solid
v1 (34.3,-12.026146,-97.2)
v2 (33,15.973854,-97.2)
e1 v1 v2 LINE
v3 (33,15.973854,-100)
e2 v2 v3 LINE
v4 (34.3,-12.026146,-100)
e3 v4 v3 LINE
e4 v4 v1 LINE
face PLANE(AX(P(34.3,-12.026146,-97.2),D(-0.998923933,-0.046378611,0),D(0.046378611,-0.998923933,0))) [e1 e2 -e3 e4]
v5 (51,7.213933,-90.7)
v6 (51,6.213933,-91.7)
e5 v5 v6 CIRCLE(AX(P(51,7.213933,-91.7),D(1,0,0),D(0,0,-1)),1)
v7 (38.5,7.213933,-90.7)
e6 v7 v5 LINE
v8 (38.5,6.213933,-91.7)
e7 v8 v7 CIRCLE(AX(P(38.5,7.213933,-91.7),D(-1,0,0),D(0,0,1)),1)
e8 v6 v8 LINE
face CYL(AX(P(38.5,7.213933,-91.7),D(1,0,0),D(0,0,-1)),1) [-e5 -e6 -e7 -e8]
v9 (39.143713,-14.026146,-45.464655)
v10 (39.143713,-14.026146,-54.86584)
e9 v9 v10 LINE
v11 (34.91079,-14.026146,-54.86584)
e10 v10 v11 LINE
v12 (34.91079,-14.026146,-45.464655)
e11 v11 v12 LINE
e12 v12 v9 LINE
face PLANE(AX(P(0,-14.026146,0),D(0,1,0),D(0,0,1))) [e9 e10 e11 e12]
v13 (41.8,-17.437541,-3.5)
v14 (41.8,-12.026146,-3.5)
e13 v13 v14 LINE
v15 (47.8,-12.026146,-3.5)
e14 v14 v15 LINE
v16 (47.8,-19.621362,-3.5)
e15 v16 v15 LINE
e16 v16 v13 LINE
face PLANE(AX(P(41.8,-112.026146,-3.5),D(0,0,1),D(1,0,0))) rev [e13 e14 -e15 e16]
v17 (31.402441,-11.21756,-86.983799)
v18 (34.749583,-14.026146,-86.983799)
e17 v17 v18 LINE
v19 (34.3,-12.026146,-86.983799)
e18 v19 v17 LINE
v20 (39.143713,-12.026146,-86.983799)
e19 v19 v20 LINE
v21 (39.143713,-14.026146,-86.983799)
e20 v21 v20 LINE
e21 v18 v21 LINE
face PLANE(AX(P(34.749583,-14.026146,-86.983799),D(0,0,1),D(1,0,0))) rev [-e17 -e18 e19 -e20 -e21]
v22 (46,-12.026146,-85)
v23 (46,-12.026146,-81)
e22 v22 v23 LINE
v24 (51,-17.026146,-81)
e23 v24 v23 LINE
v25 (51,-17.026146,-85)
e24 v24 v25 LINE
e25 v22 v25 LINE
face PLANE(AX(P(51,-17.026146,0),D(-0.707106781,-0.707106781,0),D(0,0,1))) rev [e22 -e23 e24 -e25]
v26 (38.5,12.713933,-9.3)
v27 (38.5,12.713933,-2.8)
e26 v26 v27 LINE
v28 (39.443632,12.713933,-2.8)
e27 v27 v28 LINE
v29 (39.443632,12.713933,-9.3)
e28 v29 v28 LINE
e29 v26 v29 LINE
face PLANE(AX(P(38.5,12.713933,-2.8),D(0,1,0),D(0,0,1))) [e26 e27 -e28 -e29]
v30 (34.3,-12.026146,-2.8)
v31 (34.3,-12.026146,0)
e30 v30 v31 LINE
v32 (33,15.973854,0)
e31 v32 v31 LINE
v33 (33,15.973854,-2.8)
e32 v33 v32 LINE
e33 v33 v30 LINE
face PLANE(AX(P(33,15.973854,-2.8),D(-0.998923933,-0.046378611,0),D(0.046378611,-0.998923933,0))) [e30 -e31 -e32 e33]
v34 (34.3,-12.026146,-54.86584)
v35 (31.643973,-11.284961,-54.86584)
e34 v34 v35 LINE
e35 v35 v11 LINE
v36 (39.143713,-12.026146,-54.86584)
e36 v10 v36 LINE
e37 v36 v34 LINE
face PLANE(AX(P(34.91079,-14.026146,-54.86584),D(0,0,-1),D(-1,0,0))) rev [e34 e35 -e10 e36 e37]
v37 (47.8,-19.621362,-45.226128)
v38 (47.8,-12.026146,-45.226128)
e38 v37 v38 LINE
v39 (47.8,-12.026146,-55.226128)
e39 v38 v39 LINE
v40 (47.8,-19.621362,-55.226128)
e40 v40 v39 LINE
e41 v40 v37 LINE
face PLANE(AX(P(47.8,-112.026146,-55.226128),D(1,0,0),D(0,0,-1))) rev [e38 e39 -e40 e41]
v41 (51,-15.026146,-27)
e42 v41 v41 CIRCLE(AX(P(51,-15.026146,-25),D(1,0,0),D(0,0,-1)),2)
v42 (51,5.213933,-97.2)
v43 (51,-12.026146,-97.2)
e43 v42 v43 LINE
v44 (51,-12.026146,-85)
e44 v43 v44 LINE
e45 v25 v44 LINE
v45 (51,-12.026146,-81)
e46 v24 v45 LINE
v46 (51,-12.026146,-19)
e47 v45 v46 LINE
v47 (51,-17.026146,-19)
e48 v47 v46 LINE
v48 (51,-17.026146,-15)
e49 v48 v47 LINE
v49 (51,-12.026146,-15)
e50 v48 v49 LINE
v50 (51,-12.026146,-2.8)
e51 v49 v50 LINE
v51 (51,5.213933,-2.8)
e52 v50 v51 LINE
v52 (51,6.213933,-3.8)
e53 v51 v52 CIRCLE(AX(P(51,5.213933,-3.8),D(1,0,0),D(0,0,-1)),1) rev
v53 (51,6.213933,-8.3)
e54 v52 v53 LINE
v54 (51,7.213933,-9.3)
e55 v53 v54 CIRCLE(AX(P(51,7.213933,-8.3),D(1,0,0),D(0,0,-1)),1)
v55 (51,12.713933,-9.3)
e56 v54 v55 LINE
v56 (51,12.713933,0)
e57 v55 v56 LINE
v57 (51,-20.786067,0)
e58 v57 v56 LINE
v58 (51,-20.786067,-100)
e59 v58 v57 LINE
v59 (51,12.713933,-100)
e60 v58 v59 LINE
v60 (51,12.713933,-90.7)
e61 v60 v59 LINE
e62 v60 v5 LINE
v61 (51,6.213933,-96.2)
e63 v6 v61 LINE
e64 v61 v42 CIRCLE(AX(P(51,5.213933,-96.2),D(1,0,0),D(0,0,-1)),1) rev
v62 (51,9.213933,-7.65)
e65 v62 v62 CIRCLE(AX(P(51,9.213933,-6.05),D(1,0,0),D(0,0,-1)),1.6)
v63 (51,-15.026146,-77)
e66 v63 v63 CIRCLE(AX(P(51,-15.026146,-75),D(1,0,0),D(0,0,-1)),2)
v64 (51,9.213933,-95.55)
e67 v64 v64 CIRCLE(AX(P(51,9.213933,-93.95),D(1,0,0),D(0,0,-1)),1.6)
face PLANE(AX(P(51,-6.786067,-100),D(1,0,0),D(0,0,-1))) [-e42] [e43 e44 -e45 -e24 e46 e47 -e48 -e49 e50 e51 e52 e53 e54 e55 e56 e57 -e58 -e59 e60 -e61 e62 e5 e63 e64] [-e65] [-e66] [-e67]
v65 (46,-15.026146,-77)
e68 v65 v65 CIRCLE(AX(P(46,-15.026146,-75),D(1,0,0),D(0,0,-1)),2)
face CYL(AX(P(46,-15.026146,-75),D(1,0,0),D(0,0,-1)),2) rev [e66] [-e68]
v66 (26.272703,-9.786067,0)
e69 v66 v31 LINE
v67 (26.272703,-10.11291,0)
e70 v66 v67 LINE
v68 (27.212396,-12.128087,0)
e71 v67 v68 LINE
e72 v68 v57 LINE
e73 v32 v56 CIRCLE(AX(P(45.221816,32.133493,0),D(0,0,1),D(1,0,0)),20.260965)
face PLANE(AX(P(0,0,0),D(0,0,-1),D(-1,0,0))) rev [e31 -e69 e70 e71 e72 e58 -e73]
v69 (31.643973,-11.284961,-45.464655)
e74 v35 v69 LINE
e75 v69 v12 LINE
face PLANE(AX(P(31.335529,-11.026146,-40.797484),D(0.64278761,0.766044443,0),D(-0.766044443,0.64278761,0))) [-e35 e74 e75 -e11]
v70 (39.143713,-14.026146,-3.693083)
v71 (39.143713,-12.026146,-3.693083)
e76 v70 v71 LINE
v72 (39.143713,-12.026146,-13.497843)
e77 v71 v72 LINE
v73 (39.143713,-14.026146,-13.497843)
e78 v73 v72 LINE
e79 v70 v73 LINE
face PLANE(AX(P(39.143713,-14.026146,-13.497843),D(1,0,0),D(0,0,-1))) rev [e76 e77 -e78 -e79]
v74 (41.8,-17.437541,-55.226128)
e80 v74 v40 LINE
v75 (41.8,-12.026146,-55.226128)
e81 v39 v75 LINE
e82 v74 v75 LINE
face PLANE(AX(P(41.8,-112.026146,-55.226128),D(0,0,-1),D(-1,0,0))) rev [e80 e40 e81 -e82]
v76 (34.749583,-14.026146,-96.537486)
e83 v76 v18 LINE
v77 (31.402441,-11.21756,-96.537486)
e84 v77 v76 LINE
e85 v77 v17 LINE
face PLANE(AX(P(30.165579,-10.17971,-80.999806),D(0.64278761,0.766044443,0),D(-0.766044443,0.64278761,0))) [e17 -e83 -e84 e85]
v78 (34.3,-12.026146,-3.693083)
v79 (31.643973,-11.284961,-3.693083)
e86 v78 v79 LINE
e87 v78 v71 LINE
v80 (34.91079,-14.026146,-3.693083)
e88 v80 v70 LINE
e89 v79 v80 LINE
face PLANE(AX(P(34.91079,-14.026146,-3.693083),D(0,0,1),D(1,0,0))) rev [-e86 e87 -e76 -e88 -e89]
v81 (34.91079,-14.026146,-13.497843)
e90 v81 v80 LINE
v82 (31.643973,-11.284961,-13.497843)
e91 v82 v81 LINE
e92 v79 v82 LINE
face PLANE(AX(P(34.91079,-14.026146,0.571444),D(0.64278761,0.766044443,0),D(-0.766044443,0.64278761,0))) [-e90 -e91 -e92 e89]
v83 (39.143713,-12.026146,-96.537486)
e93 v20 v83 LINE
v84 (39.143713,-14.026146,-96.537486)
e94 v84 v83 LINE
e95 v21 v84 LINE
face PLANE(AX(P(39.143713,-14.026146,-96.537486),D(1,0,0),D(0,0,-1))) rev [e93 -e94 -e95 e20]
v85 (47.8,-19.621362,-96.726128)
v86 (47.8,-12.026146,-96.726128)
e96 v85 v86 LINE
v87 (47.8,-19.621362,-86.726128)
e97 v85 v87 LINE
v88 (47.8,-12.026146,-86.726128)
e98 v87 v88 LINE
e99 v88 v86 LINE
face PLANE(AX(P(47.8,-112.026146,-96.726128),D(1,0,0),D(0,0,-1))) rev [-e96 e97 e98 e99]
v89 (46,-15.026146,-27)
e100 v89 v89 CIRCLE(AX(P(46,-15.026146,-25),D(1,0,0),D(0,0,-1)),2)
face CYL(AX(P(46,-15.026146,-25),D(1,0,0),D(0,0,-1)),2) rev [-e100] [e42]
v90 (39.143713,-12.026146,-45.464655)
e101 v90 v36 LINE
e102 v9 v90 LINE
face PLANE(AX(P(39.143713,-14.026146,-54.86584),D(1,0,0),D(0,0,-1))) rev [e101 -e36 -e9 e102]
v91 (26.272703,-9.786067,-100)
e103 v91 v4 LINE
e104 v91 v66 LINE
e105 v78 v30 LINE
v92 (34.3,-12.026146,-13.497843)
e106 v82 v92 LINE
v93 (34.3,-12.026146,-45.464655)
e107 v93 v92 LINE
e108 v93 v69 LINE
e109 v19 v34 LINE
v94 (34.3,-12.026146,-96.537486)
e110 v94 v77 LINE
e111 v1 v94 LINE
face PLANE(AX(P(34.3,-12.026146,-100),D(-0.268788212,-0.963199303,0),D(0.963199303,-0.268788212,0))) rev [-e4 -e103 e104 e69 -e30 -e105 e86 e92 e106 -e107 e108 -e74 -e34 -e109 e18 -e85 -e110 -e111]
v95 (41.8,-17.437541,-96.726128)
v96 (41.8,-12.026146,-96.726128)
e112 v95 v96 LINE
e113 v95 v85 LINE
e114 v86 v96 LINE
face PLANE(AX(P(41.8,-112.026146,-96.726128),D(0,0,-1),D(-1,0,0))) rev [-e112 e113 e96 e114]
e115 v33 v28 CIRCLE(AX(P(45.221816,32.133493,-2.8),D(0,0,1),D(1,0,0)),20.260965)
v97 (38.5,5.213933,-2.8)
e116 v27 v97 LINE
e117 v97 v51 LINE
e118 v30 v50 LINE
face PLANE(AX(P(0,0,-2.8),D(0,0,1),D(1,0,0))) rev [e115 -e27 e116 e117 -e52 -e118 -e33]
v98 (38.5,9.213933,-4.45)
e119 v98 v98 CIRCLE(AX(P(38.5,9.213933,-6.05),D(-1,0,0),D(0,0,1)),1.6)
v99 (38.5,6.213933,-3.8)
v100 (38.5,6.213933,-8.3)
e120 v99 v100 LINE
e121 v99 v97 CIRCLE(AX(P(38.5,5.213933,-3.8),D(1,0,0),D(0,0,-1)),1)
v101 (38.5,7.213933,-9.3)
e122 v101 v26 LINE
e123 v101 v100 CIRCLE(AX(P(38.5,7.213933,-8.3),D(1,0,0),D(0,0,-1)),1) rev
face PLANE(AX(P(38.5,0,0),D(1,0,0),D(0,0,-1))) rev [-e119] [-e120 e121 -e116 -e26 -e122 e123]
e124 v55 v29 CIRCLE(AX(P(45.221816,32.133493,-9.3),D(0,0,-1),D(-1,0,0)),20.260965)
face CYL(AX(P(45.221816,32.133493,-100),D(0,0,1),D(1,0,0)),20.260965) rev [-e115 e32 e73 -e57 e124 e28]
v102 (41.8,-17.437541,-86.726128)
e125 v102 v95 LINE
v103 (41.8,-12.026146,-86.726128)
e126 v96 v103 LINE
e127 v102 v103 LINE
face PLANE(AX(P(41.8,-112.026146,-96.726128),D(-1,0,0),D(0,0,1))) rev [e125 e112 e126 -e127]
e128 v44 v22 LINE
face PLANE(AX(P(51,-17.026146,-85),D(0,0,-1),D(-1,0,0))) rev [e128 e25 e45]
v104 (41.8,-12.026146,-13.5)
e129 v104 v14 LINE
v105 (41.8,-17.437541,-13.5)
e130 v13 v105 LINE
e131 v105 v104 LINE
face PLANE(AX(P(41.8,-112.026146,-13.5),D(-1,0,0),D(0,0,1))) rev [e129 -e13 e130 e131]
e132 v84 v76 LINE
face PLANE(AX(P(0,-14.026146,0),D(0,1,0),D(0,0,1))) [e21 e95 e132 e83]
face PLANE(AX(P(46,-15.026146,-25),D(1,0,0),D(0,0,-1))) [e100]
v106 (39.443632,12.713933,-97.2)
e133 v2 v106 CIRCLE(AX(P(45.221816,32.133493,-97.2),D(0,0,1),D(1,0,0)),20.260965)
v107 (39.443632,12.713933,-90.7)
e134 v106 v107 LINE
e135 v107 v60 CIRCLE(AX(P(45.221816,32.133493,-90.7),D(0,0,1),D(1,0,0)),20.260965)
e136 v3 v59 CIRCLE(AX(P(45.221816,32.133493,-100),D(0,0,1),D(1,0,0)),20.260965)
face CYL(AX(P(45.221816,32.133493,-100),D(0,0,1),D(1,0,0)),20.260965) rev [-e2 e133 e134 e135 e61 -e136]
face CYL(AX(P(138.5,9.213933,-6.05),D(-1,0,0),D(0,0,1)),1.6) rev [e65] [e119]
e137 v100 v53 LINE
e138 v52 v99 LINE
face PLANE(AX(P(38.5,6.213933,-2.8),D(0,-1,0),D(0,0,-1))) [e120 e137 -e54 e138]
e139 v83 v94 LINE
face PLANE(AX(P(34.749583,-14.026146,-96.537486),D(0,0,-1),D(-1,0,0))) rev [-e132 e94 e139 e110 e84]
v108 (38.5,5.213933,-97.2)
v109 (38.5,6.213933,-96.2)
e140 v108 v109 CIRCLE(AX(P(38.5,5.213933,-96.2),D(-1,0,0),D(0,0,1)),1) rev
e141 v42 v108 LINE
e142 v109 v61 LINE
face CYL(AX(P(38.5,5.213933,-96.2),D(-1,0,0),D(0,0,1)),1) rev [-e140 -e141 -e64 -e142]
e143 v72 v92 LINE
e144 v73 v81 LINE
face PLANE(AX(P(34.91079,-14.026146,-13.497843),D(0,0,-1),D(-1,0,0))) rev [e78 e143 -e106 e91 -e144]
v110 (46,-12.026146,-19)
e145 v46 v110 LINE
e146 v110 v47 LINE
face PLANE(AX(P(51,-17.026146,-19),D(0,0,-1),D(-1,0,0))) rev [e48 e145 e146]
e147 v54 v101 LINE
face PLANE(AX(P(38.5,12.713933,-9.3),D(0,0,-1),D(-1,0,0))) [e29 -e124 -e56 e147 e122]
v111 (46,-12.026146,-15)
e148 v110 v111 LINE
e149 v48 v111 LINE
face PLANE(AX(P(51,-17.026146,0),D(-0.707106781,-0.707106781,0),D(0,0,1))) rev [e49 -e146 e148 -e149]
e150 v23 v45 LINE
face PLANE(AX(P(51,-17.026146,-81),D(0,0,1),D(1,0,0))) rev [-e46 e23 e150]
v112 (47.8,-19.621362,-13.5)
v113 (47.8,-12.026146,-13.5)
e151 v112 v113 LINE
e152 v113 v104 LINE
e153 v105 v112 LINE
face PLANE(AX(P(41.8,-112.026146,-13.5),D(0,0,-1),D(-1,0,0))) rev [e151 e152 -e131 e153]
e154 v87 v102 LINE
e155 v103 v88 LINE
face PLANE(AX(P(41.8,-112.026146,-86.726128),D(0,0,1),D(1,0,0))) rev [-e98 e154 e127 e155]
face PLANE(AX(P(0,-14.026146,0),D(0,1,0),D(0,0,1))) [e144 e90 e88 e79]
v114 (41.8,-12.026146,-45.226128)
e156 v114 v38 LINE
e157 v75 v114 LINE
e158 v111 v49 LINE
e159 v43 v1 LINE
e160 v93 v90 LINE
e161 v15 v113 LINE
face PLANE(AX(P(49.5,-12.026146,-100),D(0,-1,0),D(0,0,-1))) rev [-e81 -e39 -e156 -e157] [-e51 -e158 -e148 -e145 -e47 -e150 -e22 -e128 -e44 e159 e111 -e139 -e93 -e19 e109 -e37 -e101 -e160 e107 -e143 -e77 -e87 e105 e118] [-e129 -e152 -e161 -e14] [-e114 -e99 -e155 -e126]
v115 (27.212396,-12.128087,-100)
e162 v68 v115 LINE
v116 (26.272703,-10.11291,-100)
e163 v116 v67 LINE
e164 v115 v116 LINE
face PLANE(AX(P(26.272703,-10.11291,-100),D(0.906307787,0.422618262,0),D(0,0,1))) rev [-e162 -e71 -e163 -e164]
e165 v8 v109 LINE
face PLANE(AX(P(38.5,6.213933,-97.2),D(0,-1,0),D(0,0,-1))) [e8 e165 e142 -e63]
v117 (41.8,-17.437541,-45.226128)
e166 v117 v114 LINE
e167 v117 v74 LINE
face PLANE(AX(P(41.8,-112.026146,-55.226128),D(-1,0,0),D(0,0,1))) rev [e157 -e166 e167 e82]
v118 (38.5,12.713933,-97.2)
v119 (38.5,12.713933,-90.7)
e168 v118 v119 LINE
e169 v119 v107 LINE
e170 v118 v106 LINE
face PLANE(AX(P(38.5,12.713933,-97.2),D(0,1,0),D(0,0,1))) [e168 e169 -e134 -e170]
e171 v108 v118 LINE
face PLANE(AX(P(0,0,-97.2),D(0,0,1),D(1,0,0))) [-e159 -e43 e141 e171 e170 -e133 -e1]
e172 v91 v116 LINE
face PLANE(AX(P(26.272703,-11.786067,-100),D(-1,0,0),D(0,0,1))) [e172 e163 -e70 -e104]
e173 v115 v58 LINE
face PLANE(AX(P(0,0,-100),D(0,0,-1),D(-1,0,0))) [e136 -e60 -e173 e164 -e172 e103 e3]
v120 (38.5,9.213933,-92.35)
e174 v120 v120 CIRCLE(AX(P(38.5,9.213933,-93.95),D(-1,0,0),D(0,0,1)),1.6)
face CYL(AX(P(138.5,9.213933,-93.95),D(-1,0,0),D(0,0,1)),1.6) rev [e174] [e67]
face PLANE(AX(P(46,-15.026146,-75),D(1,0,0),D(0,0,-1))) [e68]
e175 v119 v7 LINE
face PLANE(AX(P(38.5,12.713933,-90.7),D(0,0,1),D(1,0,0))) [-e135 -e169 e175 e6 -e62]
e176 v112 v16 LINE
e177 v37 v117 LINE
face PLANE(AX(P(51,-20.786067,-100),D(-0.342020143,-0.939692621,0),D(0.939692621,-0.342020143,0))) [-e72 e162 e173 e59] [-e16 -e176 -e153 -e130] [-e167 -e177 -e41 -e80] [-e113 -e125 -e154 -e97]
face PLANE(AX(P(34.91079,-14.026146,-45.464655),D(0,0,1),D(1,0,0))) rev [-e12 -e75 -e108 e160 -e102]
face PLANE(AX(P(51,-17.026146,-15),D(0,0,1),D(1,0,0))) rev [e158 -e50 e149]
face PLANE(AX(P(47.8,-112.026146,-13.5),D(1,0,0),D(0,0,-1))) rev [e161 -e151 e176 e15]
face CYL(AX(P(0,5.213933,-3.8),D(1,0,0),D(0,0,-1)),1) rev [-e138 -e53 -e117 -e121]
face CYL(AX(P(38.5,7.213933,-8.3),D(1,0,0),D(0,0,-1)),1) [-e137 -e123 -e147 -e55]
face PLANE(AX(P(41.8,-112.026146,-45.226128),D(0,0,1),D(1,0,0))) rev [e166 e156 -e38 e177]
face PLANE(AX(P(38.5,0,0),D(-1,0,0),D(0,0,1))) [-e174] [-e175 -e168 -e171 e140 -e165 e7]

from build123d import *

# Parameters (mm, degrees)
RESSALTO_EXTRUS_O1_DEPTH = 100
CORTE_EXTRUS_O1_DEPTH    = 100
ESBO_O4_W                = 6
ESBO_O4_H                = 10
CORTE_EXTRUS_O3_DEPTH    = 100
ESBO_O6_W                = 4.394129168
ESBO_O6_H                = 9.553687289
ESBO_O6_W_2              = 4.232922622
ESBO_O6_H_2              = 9.401185036
ESBO_O6_H_3              = 9.804760869
CORTE_EXTRUS_O4_DEPTH    = 2
CORTE_EXTRUS_O5_DEPTH    = 9.804760869
CORTE_EXTRUS_O6_DEPTH    = 9.401185036
CORTE_EXTRUS_O7_DEPTH    = 9.553687289
RESSALTO_EXTRUS_O2_DEPTH = 2.8
RESSALTO_EXTRUS_O3_DEPTH = 2.8
CHANFRO1_SIZE            = 1
CHANFRO1_SIZE2           = 1.673157185
ESBO_O12_R               = 2
CORTE_EXTRUS_O8_DEPTH    = 5
ESBO_O14_W               = 6.5
ESBO_O14_H               = 6.5
RESSALTO_EXTRUS_O4_DEPTH = 12.5
CORTE_EXTRUS_O9_DEPTH    = 100
ESBO_O17_R               = 1.6
CORTE_EXTRUS_O10_DEPTH   = 100
FILETE1_R                = 1
ESBO_O18_W               = 5
ESBO_O18_H               = 4
CORTE_EXTRUS_O11_DEPTH   = 5
CHANFRO2_SIZE            = 5


with BuildPart() as part:
    # Esboço1 → Ressalto-extrusão1 (new body)
    with BuildSketch(Plane.XY):
        Polygon((51, -6.786066874), (51, -20.786066874), (26.272703225, -11.786066874), (26.272703225, -6.786066874), align=None)
    extrude(amount=-RESSALTO_EXTRUS_O1_DEPTH)

    # Esboço2 → Corte-extrusão1 (cut)
    with BuildSketch(Plane.XY):
        Polygon((34.3, -12.026146103), (26.272703225, -9.786066874), (26.272703225, -6.786066874), (51, -6.786066874), (51, -12.026146103), (49.5, -12.026146103), align=None)
    extrude(amount=-CORTE_EXTRUS_O1_DEPTH, mode=Mode.SUBTRACT)

    # Esboço4 → Corte-extrusão3 (cut)
    with BuildSketch(Plane(origin=(0, -12.026146103, 0), x_dir=(1, 0, 0), z_dir=(0, 1, 0))):
        with Locations((44.8, 91.726127663)):
            Rectangle(ESBO_O4_W, ESBO_O4_H)
        with Locations((44.8, 50.226127663)):
            Rectangle(ESBO_O4_W, ESBO_O4_H)
        with Locations((44.8, 8.5)):
            Rectangle(ESBO_O4_W, ESBO_O4_H)
    extrude(amount=-CORTE_EXTRUS_O3_DEPTH, mode=Mode.SUBTRACT)

    # Esboço6 → Corte-extrusão4 (cut)
    with BuildSketch(Plane(origin=(0, -12.026146103, 0), x_dir=(1, 0, 0), z_dir=(0, 1, 0))):
        with Locations((36.946648007, 91.760642218)):
            Rectangle(ESBO_O6_W, ESBO_O6_H)
        with Locations((37.02725128, 50.165247763)):
            Rectangle(ESBO_O6_W_2, ESBO_O6_H_2)
        with Locations((37.02725128, 8.595463062)):
            Rectangle(ESBO_O6_W_2, ESBO_O6_H_3)
    extrude(amount=-CORTE_EXTRUS_O4_DEPTH, mode=Mode.SUBTRACT)

    # Esboço7 → Corte-extrusão5 (cut)
    with BuildSketch(Plane.XY.offset(-13.497843496)):
        Polygon((34.910789969, -12.026146103), (34.910789969, -14.026146103), (31.643973079, -11.284961255), align=None)
    extrude(amount=CORTE_EXTRUS_O5_DEPTH, mode=Mode.SUBTRACT)

    # Esboço8 → Corte-extrusão6 (cut)
    with BuildSketch(Plane.XY.offset(-54.865840281)):
        Polygon((34.910789969, -14.026146103), (34.910789969, -12.026146103), (31.335529191, -11.026146103), align=None)
    extrude(amount=CORTE_EXTRUS_O6_DEPTH, mode=Mode.SUBTRACT)

    # Esboço9 → Corte-extrusão7 (cut)
    with BuildSketch(Plane.XY.offset(-96.537485862)):
        Polygon((34.749583423, -14.026146103), (34.749583423, -12.026146103), (30.165579372, -10.179709995), align=None)
    extrude(amount=CORTE_EXTRUS_O7_DEPTH, mode=Mode.SUBTRACT)

    # Esboço10 → Ressalto-extrusão2 (add)
    with BuildSketch(Plane.XY):
        Polygon((51, -12.026146103), (51, 9.973853897), (51, 12.713933126), (49.541118417, 12.747281328), (45.801947659, 12.747281328), (33, 15.973853897), (34.3, -12.026146103), align=None)
    extrude(amount=-RESSALTO_EXTRUS_O2_DEPTH)

    # Esboço11 → Ressalto-extrusão3 (add)
    with BuildSketch(Plane(origin=(0, 0, -100), x_dir=(-1, 0, 0), z_dir=(0, 0, -1))):
        Polygon((-34.3, -12.026146103), (-33, 15.973853897), (-45.271603303, 12.747281328), (-49.541118417, 12.747281328), (-51, 12.713933126), (-51, -12.026146103), align=None)
    extrude(amount=-RESSALTO_EXTRUS_O3_DEPTH)

    # Chanfro1
    chanfro1_edges = [part.edges().sort_by_distance(p)[0] for p in [
        (26.272703225, -11.786066874, -50),
    ]]
    chanfro1_side = [part.faces().sort_by_distance(p)[0] for p in [
        (38.152449511, -16.109940913, -49.988164623),
    ]]
    chamfer(chanfro1_edges, length=CHANFRO1_SIZE, length2=CHANFRO1_SIZE2, reference=chanfro1_side[0])

    # Esboço12 → Corte-extrusão8 (cut)
    with BuildSketch(Plane(origin=(51, 0, 0), x_dir=(0, 0, -1), z_dir=(1, 0, 0))):
        with Locations((75, -15.026146103)):
            Circle(ESBO_O12_R)
        with Locations((25, -15.026146103)):
            Circle(ESBO_O12_R)
    extrude(amount=-CORTE_EXTRUS_O8_DEPTH, mode=Mode.SUBTRACT)

    # Esboço14 → Ressalto-extrusão4 (add)
    with BuildSketch(Plane(origin=(51, 0, 0), x_dir=(0, 0, -1), z_dir=(1, 0, 0))):
        with Locations((6.05, 9.463933126)):
            Rectangle(ESBO_O14_W, ESBO_O14_H)
        with Locations((93.95, 9.463933126)):
            Rectangle(ESBO_O14_W, ESBO_O14_H)
    extrude(amount=-RESSALTO_EXTRUS_O4_DEPTH)

    # Esboço15 → Corte-extrusão9 (cut)
    with BuildSketch(Plane.XY):
        with BuildLine():
            ThreePointArc((33, 15.973853897), (41.611155482, 12.19684706), (51, 12.713933126))
            ThreePointArc((51, 12.713933126), (42.289458716, 15.942170666), (33, 15.973853897))
        make_face()
    extrude(amount=-CORTE_EXTRUS_O9_DEPTH, mode=Mode.SUBTRACT)

    # Esboço17 → Corte-extrusão10 (cut)
    with BuildSketch(Plane.ZY.offset(-38.5)):
        with Locations((-6.05, 9.213933126)):
            Circle(ESBO_O17_R)
        with Locations((-93.95, 9.213933126)):
            Circle(ESBO_O17_R)
    extrude(amount=-CORTE_EXTRUS_O10_DEPTH, mode=Mode.SUBTRACT)

    # Filete1
    filete1_edges = [part.edges().sort_by_distance(p)[0] for p in [
        (44.75, 6.213933126, -2.8),
        (44.75, 6.213933126, -9.3),
        (44.75, 6.213933126, -97.2),
        (44.75, 6.213933126, -90.7),
    ]]
    fillet(filete1_edges, radius=FILETE1_R)

    # Esboço18 → Corte-extrusão11 (cut)
    with BuildSketch(Plane(origin=(0, -12.026146103, 0), x_dir=(1, 0, 0), z_dir=(0, 1, 0))):
        with Locations((48.5, 17)):
            Rectangle(ESBO_O18_W, ESBO_O18_H)
        with Locations((48.5, 83)):
            Rectangle(ESBO_O18_W, ESBO_O18_H)
    extrude(amount=-CORTE_EXTRUS_O11_DEPTH, mode=Mode.SUBTRACT)

    # Chanfro2
    chanfro2_edges = [part.edges().sort_by_distance(p)[0] for p in [
        (46, -17.026146103, -83),
        (46, -17.026146103, -17),
    ]]
    chamfer(chanfro2_edges, length=CHANFRO2_SIZE - 0.0001)  # a hair under: the kernel refuses the full size


solid = part.part
